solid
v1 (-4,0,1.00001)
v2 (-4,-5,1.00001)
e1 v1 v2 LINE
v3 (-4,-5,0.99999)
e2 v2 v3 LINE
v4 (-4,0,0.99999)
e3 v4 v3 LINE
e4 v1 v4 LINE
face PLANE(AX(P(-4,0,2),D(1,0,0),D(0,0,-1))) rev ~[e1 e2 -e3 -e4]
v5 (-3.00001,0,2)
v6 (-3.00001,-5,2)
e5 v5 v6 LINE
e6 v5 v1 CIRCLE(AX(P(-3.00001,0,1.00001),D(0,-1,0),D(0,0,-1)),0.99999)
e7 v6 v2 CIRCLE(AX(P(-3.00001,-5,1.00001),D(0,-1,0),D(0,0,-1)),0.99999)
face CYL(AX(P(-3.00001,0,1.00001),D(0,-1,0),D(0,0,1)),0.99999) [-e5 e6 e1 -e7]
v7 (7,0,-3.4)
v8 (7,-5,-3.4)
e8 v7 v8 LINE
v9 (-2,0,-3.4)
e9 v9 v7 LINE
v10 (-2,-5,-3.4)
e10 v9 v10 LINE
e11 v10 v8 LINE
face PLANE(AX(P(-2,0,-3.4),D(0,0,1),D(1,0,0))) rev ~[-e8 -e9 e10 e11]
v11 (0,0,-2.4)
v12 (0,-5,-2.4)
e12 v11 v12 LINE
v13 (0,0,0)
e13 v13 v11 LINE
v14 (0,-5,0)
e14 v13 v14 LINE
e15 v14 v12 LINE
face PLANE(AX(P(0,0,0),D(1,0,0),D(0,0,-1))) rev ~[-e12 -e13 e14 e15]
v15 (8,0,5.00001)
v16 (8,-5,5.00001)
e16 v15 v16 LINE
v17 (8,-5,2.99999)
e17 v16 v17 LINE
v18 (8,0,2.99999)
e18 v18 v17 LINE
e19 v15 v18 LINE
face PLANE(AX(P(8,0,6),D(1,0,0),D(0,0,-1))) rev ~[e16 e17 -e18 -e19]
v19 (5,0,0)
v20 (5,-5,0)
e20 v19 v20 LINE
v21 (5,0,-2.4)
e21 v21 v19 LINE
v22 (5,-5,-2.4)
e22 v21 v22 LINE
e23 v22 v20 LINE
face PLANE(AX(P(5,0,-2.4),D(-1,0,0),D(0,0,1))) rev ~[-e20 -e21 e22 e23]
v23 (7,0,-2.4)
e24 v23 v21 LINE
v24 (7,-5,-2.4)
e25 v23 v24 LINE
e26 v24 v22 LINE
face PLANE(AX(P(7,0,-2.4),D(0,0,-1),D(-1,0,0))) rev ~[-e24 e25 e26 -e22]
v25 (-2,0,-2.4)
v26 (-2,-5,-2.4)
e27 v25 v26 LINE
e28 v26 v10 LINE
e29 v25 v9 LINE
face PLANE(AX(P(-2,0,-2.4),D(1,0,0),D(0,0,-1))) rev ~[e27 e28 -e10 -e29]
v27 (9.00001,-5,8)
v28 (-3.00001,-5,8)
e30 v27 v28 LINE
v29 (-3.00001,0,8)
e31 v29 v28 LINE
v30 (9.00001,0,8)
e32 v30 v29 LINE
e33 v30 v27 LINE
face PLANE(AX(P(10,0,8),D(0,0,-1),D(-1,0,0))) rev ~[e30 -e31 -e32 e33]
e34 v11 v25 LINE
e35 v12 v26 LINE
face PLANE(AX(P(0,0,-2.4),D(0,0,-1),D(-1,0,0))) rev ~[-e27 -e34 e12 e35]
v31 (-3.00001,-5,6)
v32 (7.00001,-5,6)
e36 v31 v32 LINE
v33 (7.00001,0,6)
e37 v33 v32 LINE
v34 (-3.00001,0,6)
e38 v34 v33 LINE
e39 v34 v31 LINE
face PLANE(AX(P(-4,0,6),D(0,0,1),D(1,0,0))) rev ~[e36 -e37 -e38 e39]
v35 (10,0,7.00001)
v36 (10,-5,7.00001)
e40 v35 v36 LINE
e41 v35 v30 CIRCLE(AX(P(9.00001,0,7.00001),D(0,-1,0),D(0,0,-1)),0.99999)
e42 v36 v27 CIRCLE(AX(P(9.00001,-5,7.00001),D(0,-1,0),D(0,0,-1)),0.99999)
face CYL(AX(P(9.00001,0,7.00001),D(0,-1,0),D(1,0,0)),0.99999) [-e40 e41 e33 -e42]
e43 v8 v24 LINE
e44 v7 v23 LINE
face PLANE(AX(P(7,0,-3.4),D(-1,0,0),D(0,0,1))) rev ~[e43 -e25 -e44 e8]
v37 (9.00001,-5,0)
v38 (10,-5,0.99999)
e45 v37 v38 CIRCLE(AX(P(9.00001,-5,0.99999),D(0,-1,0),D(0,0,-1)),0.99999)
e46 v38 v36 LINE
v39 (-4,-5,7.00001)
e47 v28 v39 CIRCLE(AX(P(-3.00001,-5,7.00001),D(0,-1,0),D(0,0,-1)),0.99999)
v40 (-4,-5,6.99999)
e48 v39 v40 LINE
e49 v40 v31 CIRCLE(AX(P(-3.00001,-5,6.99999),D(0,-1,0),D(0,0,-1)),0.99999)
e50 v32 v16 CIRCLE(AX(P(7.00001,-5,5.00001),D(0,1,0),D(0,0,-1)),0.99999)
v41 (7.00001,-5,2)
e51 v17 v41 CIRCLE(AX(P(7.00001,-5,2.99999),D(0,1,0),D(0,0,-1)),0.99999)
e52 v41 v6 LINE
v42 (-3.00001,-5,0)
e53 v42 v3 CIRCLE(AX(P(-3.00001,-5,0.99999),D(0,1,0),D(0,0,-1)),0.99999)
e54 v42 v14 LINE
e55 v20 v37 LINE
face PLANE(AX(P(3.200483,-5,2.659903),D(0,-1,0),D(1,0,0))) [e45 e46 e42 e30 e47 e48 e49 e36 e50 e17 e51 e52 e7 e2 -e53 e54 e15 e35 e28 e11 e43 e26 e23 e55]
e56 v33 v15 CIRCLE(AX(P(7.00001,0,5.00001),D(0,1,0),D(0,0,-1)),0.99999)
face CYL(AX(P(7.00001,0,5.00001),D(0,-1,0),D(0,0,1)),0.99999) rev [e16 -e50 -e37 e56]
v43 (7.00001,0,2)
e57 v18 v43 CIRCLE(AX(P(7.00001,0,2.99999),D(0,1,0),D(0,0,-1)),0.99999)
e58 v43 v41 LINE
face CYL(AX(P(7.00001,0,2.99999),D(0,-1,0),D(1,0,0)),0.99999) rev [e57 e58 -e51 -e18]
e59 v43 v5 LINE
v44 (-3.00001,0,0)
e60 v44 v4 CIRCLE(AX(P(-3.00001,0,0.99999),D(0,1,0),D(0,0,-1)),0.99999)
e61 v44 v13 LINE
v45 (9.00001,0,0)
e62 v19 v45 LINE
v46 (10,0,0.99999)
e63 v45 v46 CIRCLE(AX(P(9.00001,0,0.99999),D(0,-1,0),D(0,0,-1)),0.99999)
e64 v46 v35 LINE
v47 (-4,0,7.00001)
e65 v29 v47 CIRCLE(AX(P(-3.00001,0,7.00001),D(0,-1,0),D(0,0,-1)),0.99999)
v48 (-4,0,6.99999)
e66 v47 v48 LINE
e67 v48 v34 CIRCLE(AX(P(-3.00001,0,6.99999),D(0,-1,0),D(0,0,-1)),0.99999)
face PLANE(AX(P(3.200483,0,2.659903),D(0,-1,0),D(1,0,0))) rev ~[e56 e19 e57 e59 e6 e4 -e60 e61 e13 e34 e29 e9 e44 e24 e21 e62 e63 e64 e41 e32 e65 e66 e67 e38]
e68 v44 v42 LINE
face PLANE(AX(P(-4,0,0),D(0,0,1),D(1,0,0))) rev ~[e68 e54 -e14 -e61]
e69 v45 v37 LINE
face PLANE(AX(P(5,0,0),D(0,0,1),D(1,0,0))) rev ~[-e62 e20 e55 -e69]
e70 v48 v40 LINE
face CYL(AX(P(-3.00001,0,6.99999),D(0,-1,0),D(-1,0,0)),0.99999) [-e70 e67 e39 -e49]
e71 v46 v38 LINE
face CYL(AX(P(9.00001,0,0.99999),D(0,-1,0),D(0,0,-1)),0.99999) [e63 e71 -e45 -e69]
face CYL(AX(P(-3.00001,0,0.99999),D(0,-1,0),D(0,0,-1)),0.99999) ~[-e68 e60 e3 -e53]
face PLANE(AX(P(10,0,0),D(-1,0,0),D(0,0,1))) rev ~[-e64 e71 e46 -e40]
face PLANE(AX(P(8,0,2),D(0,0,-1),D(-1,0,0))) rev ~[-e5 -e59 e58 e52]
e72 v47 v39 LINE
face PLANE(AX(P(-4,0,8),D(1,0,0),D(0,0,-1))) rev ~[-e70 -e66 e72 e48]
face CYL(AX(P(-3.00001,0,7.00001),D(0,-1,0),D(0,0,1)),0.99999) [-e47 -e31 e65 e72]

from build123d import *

# Parameters (mm, degrees)
F1_DEPTH = 5
F2_R     = 0.99999


# Not quite as in the source:
# - a fillet or chamfer is up to 0.001 mm smaller than in the source, because OpenCascade refuses the exact size
# - a feature names something its author has since deleted; it is built from what else it names


with BuildPart() as f1:
    # F0 (on Front) → F1 (new body)
    with BuildSketch(Plane.XZ):
        Polygon((-4, 0), (0, 0), (0, -2.4), (-2, -2.4), (-2, -3.4), (7, -3.4), (7, -2.4), (5, -2.4), (5, 0), (10, 0), (10, 8), (-4, 8), (-4, 6), (8, 6), (8, 2), (-4, 2), align=None)
    extrude(amount=F1_DEPTH)

    # F2 (radius 1 in the source; OpenCascade refuses exactly that, so slightly less here)
    f2_edges = [f1.edges().sort_by_distance(p)[0] for p in [
        (8, -2.5, 6),
        (8, -2.5, 2),
        (10, -2.5, 0),
        (10, -2.5, 8),
        (-4, -2.5, 8),
        (-4, -2.5, 6),
        (-4, -2.5, 0),
        (-4, -2.5, 2),
    ]]
    fillet(f2_edges, radius=F2_R)


solid = f1.part
